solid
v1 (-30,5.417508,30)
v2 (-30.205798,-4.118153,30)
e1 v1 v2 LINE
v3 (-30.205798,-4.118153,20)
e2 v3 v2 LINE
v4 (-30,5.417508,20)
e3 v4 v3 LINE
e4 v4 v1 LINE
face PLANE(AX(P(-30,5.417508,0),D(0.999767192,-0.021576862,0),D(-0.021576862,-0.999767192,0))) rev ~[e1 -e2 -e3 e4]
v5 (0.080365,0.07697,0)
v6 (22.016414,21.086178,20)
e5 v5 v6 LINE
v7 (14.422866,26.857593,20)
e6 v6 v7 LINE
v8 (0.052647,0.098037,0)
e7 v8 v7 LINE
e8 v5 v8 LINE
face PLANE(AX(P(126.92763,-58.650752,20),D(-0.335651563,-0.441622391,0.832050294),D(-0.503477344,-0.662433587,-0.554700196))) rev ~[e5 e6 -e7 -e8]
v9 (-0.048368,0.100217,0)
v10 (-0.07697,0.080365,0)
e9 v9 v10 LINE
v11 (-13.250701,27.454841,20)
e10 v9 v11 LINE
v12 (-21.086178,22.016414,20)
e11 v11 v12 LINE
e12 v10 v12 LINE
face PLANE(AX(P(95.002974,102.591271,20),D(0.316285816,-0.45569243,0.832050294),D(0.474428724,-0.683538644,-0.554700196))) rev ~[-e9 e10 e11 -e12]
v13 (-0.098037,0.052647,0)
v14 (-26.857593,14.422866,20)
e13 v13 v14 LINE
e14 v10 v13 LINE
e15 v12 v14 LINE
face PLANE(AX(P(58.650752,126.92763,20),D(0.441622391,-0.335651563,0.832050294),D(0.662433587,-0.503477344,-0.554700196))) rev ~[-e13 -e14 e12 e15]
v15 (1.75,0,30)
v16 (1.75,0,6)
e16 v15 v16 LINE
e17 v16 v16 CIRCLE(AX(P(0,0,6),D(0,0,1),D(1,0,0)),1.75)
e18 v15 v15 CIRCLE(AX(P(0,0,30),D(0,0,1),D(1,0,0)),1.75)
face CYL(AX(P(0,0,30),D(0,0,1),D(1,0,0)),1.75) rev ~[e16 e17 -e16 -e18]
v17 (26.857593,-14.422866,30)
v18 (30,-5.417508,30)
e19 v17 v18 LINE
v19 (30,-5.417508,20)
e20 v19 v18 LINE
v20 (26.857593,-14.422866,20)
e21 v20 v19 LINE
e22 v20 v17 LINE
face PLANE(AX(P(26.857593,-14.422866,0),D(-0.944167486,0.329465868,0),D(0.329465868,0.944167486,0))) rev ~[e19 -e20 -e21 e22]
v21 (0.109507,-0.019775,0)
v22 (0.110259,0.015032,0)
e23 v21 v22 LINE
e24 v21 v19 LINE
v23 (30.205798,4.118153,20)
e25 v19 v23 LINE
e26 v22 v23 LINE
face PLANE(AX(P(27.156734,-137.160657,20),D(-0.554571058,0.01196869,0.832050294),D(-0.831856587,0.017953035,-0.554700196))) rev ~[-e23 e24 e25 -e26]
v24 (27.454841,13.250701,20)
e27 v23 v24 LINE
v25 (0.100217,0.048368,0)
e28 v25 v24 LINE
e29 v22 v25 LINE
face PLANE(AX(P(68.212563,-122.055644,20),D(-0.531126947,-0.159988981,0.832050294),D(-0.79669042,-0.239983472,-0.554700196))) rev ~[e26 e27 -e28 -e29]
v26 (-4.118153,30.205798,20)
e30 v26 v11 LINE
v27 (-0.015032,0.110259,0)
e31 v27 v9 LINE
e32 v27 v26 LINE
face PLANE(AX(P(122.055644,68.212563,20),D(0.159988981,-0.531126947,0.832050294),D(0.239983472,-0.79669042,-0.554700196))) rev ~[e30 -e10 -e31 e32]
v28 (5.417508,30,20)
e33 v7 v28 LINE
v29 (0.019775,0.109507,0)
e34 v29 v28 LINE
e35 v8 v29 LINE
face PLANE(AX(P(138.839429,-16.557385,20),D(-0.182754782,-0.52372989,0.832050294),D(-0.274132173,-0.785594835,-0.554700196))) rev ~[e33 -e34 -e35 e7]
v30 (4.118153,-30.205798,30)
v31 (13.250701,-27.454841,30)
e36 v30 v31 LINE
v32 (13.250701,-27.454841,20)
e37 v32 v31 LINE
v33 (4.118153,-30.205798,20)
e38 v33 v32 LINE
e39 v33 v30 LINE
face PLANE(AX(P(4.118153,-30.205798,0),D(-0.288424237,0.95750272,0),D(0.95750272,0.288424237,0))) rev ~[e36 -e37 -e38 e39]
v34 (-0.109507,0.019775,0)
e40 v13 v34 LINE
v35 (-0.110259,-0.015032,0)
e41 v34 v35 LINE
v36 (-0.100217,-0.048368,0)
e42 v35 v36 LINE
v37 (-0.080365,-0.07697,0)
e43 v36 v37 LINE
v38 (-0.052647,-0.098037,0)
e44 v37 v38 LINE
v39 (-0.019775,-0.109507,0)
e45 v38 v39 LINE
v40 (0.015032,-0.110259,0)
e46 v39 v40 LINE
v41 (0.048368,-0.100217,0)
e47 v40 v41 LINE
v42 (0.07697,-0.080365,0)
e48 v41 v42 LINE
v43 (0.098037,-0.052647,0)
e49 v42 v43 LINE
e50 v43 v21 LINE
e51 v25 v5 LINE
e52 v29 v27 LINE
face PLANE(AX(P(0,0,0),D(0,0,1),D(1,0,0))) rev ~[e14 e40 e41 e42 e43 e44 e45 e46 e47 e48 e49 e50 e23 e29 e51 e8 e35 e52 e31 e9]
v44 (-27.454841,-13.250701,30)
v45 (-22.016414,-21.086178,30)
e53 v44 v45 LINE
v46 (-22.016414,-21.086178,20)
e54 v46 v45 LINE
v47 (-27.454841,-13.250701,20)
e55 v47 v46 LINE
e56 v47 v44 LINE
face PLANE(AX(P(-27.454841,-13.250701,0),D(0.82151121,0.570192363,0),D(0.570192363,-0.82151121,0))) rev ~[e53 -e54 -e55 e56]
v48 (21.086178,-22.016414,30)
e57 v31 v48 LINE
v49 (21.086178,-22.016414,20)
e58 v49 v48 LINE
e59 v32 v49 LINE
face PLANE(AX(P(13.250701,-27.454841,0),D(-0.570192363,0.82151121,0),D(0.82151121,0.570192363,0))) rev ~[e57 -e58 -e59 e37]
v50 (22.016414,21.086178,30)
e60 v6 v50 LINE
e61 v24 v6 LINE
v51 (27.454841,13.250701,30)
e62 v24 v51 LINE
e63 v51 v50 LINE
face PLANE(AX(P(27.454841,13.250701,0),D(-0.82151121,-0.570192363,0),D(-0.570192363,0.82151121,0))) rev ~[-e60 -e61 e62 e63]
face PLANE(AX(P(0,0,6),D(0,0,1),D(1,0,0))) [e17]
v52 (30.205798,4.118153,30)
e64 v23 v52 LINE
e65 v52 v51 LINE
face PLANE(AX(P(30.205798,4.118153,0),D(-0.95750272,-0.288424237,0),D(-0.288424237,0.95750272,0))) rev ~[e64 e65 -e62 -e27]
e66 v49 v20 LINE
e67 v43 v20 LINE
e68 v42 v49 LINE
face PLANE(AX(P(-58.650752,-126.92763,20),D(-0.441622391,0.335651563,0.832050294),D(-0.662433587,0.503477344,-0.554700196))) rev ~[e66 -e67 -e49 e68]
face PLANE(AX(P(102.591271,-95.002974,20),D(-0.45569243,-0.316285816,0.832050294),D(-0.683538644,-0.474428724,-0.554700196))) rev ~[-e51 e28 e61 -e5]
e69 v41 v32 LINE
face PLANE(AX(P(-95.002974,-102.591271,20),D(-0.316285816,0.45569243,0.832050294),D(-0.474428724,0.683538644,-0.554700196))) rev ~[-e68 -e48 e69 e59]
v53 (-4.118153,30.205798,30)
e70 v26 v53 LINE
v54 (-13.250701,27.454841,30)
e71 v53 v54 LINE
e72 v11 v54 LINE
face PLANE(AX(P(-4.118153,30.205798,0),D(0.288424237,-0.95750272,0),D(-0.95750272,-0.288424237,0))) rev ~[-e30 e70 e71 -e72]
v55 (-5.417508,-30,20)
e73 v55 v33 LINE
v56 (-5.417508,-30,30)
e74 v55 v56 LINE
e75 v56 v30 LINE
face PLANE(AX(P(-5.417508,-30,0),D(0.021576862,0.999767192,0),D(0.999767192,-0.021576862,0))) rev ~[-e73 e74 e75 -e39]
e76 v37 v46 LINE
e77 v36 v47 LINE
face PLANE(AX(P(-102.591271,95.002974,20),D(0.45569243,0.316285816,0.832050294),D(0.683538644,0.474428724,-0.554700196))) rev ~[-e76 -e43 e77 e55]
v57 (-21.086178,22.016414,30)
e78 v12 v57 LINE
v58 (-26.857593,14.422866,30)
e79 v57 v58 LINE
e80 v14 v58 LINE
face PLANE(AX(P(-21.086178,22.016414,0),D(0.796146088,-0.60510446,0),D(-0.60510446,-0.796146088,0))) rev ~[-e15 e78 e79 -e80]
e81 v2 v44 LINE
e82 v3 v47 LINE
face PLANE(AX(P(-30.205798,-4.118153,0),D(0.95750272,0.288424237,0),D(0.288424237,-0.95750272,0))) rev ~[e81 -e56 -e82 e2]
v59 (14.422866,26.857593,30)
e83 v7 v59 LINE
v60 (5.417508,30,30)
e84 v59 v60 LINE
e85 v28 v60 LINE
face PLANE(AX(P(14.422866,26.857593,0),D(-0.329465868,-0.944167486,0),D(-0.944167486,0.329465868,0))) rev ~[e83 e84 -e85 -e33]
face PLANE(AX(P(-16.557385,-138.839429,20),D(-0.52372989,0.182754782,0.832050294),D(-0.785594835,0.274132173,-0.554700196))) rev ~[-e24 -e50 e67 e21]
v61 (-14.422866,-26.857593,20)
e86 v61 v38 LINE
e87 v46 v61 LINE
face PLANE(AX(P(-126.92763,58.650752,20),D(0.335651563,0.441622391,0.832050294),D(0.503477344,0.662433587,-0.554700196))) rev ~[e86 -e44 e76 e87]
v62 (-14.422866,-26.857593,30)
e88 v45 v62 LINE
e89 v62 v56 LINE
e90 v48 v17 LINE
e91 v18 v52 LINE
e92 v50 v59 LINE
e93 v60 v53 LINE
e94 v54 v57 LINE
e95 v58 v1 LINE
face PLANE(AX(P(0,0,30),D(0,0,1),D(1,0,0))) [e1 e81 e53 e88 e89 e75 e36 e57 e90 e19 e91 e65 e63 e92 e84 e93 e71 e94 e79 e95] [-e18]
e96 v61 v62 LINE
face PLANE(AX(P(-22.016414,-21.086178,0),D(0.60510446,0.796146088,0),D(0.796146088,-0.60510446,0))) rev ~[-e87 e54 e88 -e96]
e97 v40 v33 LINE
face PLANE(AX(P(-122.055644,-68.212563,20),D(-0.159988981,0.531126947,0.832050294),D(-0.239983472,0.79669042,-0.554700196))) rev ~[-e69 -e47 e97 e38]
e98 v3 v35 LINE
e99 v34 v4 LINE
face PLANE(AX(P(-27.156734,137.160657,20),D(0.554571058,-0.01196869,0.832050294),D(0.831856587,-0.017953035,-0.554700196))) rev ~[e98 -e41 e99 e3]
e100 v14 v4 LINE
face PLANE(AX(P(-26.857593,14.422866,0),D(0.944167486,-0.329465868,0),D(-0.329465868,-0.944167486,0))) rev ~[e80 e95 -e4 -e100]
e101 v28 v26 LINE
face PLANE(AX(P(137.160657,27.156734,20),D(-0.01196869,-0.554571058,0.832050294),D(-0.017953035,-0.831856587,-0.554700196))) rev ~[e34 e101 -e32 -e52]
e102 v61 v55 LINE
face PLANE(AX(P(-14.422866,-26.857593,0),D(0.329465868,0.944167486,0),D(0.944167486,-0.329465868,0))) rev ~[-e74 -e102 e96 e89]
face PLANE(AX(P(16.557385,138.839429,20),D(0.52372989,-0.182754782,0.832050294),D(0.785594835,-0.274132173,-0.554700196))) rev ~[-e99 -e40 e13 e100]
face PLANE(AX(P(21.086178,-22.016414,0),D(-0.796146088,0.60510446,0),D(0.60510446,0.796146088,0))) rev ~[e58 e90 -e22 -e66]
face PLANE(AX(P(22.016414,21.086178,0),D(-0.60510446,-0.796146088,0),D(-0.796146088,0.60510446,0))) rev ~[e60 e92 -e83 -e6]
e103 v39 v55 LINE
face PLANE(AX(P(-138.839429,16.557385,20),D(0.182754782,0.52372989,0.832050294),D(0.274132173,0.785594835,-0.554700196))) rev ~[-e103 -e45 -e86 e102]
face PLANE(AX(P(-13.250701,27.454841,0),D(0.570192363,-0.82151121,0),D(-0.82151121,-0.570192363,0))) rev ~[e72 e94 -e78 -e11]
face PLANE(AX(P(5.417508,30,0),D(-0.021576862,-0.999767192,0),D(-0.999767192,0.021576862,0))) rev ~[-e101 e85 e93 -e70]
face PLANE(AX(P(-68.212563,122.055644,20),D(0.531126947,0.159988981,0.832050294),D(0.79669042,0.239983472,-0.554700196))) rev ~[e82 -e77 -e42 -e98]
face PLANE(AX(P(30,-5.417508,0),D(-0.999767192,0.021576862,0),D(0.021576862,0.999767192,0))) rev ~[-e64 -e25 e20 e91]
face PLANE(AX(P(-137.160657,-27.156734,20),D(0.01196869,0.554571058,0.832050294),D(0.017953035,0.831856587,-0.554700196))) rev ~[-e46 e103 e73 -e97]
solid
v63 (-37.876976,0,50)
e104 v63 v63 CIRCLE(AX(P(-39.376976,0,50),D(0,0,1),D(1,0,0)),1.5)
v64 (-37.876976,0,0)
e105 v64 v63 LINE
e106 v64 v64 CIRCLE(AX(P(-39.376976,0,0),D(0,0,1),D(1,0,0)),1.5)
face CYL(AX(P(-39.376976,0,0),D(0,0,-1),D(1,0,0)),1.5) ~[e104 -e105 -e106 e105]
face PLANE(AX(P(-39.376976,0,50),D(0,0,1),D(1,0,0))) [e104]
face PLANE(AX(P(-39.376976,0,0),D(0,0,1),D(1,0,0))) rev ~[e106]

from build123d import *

# Parameters (mm, degrees)
F1_DEPTH     = 30
F2_T1_DEPTH  = 273.0855354784
F2_T3_DEPTH  = 273.0855354784
F2_T5_DEPTH  = 273.0855354784
F2_T7_DEPTH  = 273.0855354784
F2_T9_DEPTH  = 273.0855354784
F2_T11_DEPTH = 273.0855354784
F2_T13_DEPTH = 273.0855354784
F2_T15_DEPTH = 273.0855354784
F2_T17_DEPTH = 273.0855354784
F2_T19_DEPTH = 273.0855354784
F2_T21_DEPTH = 273.0855354784
F2_T23_DEPTH = 273.0855354784
F2_T25_DEPTH = 273.0855354784
F2_T27_DEPTH = 273.0855354784
F2_T29_DEPTH = 273.0855354784
F2_T31_DEPTH = 273.0855354784
F2_T33_DEPTH = 273.0855354784
F2_T35_DEPTH = 273.0855354784
F2_T37_DEPTH = 273.0855354784
F2_T39_DEPTH = 273.0855354784
F3_R         = 1.75
F4_DEPTH     = 24
F5_R         = 1.5
F6_DEPTH     = 50


# Not quite as in the source:
# - a fillet or chamfer that OpenCascade refuses, or shapes differently, is made with other operations: its cross-section is extruded or revolved along the edge and cut away or added


with BuildPart() as f1:
    # F0 (on Top) → F1 (new body)
    with BuildSketch(Plane.XY):
        Polygon((13.2507014279, -27.4548412117), (21.0861784508, -22.0164137096), (26.8575934109, -14.4228662363), (30, -5.4175081257), (30.2057975669, 4.1181534262), (27.4548412117, 13.2507014279), (22.0164137096, 21.0861784508), (14.4228662363, 26.8575934109), (5.4175081257, 30), (-4.1181534262, 30.2057975669), (-13.2507014279, 27.4548412117), (-21.0861784508, 22.0164137096), (-26.8575934109, 14.4228662363), (-30, 5.4175081257), (-30.2057975669, -4.1181534262), (-27.4548412117, -13.2507014279), (-22.0164137096, -21.0861784508), (-14.4228662363, -26.8575934109), (-5.4175081257, -30), (4.1181534262, -30.2057975669), align=None)
    extrude(amount=F1_DEPTH)

    # F2: chamfer of 30 x 20 on 20 edges, made by hand

    # F2_s2 → F2_t1 (cut)
    with BuildSketch(Plane(origin=(-128.9192417481, 44.9861815336, 0), x_dir=(0, 0, 1), z_dir=(0.944167486, -0.3294658683, 0))):
        Polygon((20, 30.1099085987), (0, 0.1099085987), (0, 30.1099085987), align=None)
    extrude(amount=F2_T1_DEPTH, mode=Mode.SUBTRACT)

    # F2_s4 → F2_t3 (cut)
    with BuildSketch(Plane(origin=(-136.5109795463, 2.9461644886, 0), x_dir=(0, 0, 1), z_dir=(0.9997671924, -0.0215768622, 0))):
        Polygon((20, 30.1099085987), (0, 0.1099085987), (0, 30.1099085987), align=None)
    extrude(amount=F2_T3_DEPTH, mode=Mode.SUBTRACT)

    # F2_s6 → F2_t5 (cut)
    with BuildSketch(Plane(origin=(-130.7400715385, -39.3822436636, 0), x_dir=(0, 0, 1), z_dir=(0.9575027202, 0.2884242374, 0))):
        Polygon((20, 30.1099085987), (0, 0.1099085987), (0, 30.1099085987), align=None)
    extrude(amount=F2_T5_DEPTH, mode=Mode.SUBTRACT)

    # F2_s8 → F2_t7 (cut)
    with BuildSketch(Plane(origin=(-39.3822436636, 130.7400715385, 0), x_dir=(0, 0, 1), z_dir=(0.2884242374, -0.9575027202, 0))):
        Polygon((20, 30.1099085987), (0, 0.1099085987), (0, 30.1099085987), align=None)
    extrude(amount=F2_T7_DEPTH, mode=Mode.SUBTRACT)

    # F2_s10 → F2_t9 (cut)
    with BuildSketch(Plane(origin=(-77.8556434138, 112.171414409, 0), x_dir=(0, 0, 1), z_dir=(0.5701923632, -0.8215112105, 0))):
        Polygon((20, 30.1099085987), (0, 0.1099085987), (0, 30.1099085987), align=None)
    extrude(amount=F2_T9_DEPTH, mode=Mode.SUBTRACT)

    # F2_s12 → F2_t11 (cut)
    with BuildSketch(Plane(origin=(-108.7079903345, 82.6226376928, 0), x_dir=(0, 0, 1), z_dir=(0.7961460877, -0.6051044597, 0))):
        Polygon((20, 30.1099085987), (0, 0.1099085987), (0, 30.1099085987), align=None)
    extrude(amount=F2_T11_DEPTH, mode=Mode.SUBTRACT)

    # F2_s14 → F2_t13 (cut)
    with BuildSketch(Plane(origin=(-112.171414409, -77.8556434138, 0), x_dir=(0, 0, 1), z_dir=(0.8215112105, 0.5701923632, 0))):
        Polygon((20, 30.1099085987), (0, 0.1099085987), (0, 30.1099085987), align=None)
    extrude(amount=F2_T13_DEPTH, mode=Mode.SUBTRACT)

    # F2_s16 → F2_t15 (cut)
    with BuildSketch(Plane(origin=(-82.6226376928, -108.7079903345, 0), x_dir=(0, 0, 1), z_dir=(0.6051044597, 0.7961460877, 0))):
        Polygon((20, 30.1099085987), (0, 0.1099085987), (0, 30.1099085987), align=None)
    extrude(amount=F2_T15_DEPTH, mode=Mode.SUBTRACT)

    # F2_s18 → F2_t17 (cut)
    with BuildSketch(Plane(origin=(-44.9861815336, -128.9192417481, 0), x_dir=(0, 0, 1), z_dir=(0.3294658683, 0.944167486, 0))):
        Polygon((20, 30.1099085987), (0, 0.1099085987), (0, 30.1099085987), align=None)
    extrude(amount=F2_T17_DEPTH, mode=Mode.SUBTRACT)

    # F2_s20 → F2_t19 (cut)
    with BuildSketch(Plane(origin=(-2.9461644886, -136.5109795463, 0), x_dir=(0, 0, 1), z_dir=(0.0215768622, 0.9997671924, 0))):
        Polygon((20, 30.1099085987), (0, 0.1099085987), (0, 30.1099085987), align=None)
    extrude(amount=F2_T19_DEPTH, mode=Mode.SUBTRACT)

    # F2_s22 → F2_t21 (cut)
    with BuildSketch(Plane(origin=(39.3822436636, -130.7400715385, 0), x_dir=(0, 0, 1), z_dir=(-0.2884242374, 0.9575027202, 0))):
        Polygon((20, 30.1099085987), (0, 0.1099085987), (0, 30.1099085987), align=None)
    extrude(amount=F2_T21_DEPTH, mode=Mode.SUBTRACT)

    # F2_s24 → F2_t23 (cut)
    with BuildSketch(Plane(origin=(77.8556434138, -112.171414409, 0), x_dir=(0, 0, 1), z_dir=(-0.5701923632, 0.8215112105, 0))):
        Polygon((20, 30.1099085987), (0, 0.1099085987), (0, 30.1099085987), align=None)
    extrude(amount=F2_T23_DEPTH, mode=Mode.SUBTRACT)

    # F2_s26 → F2_t25 (cut)
    with BuildSketch(Plane(origin=(108.7079903345, -82.6226376928, 0), x_dir=(0, 0, 1), z_dir=(-0.7961460877, 0.6051044597, 0))):
        Polygon((20, 30.1099085987), (0, 0.1099085987), (0, 30.1099085987), align=None)
    extrude(amount=F2_T25_DEPTH, mode=Mode.SUBTRACT)

    # F2_s28 → F2_t27 (cut)
    with BuildSketch(Plane(origin=(128.9192417481, -44.9861815336, 0), x_dir=(0, 0, 1), z_dir=(-0.944167486, 0.3294658683, 0))):
        Polygon((20, 30.1099085987), (0, 0.1099085987), (0, 30.1099085987), align=None)
    extrude(amount=F2_T27_DEPTH, mode=Mode.SUBTRACT)

    # F2_s30 → F2_t29 (cut)
    with BuildSketch(Plane(origin=(136.5109795463, -2.9461644886, 0), x_dir=(0, 0, 1), z_dir=(-0.9997671924, 0.0215768622, 0))):
        Polygon((20, 30.1099085987), (0, 0.1099085987), (0, 30.1099085987), align=None)
    extrude(amount=F2_T29_DEPTH, mode=Mode.SUBTRACT)

    # F2_s32 → F2_t31 (cut)
    with BuildSketch(Plane(origin=(130.7400715385, 39.3822436636, 0), x_dir=(0, 0, 1), z_dir=(-0.9575027202, -0.2884242374, 0))):
        Polygon((20, 30.1099085987), (0, 0.1099085987), (0, 30.1099085987), align=None)
    extrude(amount=F2_T31_DEPTH, mode=Mode.SUBTRACT)

    # F2_s34 → F2_t33 (cut)
    with BuildSketch(Plane(origin=(112.171414409, 77.8556434138, 0), x_dir=(0, 0, 1), z_dir=(-0.8215112105, -0.5701923632, 0))):
        Polygon((20, 30.1099085987), (0, 0.1099085987), (0, 30.1099085987), align=None)
    extrude(amount=F2_T33_DEPTH, mode=Mode.SUBTRACT)

    # F2_s36 → F2_t35 (cut)
    with BuildSketch(Plane(origin=(82.6226376928, 108.7079903345, 0), x_dir=(0, 0, 1), z_dir=(-0.6051044597, -0.7961460877, 0))):
        Polygon((20, 30.1099085987), (0, 0.1099085987), (0, 30.1099085987), align=None)
    extrude(amount=F2_T35_DEPTH, mode=Mode.SUBTRACT)

    # F2_s38 → F2_t37 (cut)
    with BuildSketch(Plane(origin=(44.9861815336, 128.9192417481, 0), x_dir=(0, 0, 1), z_dir=(-0.3294658683, -0.944167486, 0))):
        Polygon((20, 30.1099085987), (0, 0.1099085987), (0, 30.1099085987), align=None)
    extrude(amount=F2_T37_DEPTH, mode=Mode.SUBTRACT)

    # F2_s40 → F2_t39 (cut)
    with BuildSketch(Plane(origin=(2.9461644886, 136.5109795463, 0), x_dir=(0, 0, 1), z_dir=(-0.0215768622, -0.9997671924, 0))):
        Polygon((20, 30.1099085987), (0, 0.1099085987), (0, 30.1099085987), align=None)
    extrude(amount=F2_T39_DEPTH, mode=Mode.SUBTRACT)

    # F3 (on face) → F4 (cut)
    with BuildSketch(Plane.XY.offset(30)):
        Circle(F3_R)
    extrude(amount=-F4_DEPTH, mode=Mode.SUBTRACT)


with BuildPart() as f6:
    # F5 (on Top) → F6 (new body)
    with BuildSketch(Plane.XY):
        with Locations((-39.3769755578, 0)):
            Circle(F5_R)
    extrude(amount=F6_DEPTH)


solid = Compound([f1.part, f6.part])
